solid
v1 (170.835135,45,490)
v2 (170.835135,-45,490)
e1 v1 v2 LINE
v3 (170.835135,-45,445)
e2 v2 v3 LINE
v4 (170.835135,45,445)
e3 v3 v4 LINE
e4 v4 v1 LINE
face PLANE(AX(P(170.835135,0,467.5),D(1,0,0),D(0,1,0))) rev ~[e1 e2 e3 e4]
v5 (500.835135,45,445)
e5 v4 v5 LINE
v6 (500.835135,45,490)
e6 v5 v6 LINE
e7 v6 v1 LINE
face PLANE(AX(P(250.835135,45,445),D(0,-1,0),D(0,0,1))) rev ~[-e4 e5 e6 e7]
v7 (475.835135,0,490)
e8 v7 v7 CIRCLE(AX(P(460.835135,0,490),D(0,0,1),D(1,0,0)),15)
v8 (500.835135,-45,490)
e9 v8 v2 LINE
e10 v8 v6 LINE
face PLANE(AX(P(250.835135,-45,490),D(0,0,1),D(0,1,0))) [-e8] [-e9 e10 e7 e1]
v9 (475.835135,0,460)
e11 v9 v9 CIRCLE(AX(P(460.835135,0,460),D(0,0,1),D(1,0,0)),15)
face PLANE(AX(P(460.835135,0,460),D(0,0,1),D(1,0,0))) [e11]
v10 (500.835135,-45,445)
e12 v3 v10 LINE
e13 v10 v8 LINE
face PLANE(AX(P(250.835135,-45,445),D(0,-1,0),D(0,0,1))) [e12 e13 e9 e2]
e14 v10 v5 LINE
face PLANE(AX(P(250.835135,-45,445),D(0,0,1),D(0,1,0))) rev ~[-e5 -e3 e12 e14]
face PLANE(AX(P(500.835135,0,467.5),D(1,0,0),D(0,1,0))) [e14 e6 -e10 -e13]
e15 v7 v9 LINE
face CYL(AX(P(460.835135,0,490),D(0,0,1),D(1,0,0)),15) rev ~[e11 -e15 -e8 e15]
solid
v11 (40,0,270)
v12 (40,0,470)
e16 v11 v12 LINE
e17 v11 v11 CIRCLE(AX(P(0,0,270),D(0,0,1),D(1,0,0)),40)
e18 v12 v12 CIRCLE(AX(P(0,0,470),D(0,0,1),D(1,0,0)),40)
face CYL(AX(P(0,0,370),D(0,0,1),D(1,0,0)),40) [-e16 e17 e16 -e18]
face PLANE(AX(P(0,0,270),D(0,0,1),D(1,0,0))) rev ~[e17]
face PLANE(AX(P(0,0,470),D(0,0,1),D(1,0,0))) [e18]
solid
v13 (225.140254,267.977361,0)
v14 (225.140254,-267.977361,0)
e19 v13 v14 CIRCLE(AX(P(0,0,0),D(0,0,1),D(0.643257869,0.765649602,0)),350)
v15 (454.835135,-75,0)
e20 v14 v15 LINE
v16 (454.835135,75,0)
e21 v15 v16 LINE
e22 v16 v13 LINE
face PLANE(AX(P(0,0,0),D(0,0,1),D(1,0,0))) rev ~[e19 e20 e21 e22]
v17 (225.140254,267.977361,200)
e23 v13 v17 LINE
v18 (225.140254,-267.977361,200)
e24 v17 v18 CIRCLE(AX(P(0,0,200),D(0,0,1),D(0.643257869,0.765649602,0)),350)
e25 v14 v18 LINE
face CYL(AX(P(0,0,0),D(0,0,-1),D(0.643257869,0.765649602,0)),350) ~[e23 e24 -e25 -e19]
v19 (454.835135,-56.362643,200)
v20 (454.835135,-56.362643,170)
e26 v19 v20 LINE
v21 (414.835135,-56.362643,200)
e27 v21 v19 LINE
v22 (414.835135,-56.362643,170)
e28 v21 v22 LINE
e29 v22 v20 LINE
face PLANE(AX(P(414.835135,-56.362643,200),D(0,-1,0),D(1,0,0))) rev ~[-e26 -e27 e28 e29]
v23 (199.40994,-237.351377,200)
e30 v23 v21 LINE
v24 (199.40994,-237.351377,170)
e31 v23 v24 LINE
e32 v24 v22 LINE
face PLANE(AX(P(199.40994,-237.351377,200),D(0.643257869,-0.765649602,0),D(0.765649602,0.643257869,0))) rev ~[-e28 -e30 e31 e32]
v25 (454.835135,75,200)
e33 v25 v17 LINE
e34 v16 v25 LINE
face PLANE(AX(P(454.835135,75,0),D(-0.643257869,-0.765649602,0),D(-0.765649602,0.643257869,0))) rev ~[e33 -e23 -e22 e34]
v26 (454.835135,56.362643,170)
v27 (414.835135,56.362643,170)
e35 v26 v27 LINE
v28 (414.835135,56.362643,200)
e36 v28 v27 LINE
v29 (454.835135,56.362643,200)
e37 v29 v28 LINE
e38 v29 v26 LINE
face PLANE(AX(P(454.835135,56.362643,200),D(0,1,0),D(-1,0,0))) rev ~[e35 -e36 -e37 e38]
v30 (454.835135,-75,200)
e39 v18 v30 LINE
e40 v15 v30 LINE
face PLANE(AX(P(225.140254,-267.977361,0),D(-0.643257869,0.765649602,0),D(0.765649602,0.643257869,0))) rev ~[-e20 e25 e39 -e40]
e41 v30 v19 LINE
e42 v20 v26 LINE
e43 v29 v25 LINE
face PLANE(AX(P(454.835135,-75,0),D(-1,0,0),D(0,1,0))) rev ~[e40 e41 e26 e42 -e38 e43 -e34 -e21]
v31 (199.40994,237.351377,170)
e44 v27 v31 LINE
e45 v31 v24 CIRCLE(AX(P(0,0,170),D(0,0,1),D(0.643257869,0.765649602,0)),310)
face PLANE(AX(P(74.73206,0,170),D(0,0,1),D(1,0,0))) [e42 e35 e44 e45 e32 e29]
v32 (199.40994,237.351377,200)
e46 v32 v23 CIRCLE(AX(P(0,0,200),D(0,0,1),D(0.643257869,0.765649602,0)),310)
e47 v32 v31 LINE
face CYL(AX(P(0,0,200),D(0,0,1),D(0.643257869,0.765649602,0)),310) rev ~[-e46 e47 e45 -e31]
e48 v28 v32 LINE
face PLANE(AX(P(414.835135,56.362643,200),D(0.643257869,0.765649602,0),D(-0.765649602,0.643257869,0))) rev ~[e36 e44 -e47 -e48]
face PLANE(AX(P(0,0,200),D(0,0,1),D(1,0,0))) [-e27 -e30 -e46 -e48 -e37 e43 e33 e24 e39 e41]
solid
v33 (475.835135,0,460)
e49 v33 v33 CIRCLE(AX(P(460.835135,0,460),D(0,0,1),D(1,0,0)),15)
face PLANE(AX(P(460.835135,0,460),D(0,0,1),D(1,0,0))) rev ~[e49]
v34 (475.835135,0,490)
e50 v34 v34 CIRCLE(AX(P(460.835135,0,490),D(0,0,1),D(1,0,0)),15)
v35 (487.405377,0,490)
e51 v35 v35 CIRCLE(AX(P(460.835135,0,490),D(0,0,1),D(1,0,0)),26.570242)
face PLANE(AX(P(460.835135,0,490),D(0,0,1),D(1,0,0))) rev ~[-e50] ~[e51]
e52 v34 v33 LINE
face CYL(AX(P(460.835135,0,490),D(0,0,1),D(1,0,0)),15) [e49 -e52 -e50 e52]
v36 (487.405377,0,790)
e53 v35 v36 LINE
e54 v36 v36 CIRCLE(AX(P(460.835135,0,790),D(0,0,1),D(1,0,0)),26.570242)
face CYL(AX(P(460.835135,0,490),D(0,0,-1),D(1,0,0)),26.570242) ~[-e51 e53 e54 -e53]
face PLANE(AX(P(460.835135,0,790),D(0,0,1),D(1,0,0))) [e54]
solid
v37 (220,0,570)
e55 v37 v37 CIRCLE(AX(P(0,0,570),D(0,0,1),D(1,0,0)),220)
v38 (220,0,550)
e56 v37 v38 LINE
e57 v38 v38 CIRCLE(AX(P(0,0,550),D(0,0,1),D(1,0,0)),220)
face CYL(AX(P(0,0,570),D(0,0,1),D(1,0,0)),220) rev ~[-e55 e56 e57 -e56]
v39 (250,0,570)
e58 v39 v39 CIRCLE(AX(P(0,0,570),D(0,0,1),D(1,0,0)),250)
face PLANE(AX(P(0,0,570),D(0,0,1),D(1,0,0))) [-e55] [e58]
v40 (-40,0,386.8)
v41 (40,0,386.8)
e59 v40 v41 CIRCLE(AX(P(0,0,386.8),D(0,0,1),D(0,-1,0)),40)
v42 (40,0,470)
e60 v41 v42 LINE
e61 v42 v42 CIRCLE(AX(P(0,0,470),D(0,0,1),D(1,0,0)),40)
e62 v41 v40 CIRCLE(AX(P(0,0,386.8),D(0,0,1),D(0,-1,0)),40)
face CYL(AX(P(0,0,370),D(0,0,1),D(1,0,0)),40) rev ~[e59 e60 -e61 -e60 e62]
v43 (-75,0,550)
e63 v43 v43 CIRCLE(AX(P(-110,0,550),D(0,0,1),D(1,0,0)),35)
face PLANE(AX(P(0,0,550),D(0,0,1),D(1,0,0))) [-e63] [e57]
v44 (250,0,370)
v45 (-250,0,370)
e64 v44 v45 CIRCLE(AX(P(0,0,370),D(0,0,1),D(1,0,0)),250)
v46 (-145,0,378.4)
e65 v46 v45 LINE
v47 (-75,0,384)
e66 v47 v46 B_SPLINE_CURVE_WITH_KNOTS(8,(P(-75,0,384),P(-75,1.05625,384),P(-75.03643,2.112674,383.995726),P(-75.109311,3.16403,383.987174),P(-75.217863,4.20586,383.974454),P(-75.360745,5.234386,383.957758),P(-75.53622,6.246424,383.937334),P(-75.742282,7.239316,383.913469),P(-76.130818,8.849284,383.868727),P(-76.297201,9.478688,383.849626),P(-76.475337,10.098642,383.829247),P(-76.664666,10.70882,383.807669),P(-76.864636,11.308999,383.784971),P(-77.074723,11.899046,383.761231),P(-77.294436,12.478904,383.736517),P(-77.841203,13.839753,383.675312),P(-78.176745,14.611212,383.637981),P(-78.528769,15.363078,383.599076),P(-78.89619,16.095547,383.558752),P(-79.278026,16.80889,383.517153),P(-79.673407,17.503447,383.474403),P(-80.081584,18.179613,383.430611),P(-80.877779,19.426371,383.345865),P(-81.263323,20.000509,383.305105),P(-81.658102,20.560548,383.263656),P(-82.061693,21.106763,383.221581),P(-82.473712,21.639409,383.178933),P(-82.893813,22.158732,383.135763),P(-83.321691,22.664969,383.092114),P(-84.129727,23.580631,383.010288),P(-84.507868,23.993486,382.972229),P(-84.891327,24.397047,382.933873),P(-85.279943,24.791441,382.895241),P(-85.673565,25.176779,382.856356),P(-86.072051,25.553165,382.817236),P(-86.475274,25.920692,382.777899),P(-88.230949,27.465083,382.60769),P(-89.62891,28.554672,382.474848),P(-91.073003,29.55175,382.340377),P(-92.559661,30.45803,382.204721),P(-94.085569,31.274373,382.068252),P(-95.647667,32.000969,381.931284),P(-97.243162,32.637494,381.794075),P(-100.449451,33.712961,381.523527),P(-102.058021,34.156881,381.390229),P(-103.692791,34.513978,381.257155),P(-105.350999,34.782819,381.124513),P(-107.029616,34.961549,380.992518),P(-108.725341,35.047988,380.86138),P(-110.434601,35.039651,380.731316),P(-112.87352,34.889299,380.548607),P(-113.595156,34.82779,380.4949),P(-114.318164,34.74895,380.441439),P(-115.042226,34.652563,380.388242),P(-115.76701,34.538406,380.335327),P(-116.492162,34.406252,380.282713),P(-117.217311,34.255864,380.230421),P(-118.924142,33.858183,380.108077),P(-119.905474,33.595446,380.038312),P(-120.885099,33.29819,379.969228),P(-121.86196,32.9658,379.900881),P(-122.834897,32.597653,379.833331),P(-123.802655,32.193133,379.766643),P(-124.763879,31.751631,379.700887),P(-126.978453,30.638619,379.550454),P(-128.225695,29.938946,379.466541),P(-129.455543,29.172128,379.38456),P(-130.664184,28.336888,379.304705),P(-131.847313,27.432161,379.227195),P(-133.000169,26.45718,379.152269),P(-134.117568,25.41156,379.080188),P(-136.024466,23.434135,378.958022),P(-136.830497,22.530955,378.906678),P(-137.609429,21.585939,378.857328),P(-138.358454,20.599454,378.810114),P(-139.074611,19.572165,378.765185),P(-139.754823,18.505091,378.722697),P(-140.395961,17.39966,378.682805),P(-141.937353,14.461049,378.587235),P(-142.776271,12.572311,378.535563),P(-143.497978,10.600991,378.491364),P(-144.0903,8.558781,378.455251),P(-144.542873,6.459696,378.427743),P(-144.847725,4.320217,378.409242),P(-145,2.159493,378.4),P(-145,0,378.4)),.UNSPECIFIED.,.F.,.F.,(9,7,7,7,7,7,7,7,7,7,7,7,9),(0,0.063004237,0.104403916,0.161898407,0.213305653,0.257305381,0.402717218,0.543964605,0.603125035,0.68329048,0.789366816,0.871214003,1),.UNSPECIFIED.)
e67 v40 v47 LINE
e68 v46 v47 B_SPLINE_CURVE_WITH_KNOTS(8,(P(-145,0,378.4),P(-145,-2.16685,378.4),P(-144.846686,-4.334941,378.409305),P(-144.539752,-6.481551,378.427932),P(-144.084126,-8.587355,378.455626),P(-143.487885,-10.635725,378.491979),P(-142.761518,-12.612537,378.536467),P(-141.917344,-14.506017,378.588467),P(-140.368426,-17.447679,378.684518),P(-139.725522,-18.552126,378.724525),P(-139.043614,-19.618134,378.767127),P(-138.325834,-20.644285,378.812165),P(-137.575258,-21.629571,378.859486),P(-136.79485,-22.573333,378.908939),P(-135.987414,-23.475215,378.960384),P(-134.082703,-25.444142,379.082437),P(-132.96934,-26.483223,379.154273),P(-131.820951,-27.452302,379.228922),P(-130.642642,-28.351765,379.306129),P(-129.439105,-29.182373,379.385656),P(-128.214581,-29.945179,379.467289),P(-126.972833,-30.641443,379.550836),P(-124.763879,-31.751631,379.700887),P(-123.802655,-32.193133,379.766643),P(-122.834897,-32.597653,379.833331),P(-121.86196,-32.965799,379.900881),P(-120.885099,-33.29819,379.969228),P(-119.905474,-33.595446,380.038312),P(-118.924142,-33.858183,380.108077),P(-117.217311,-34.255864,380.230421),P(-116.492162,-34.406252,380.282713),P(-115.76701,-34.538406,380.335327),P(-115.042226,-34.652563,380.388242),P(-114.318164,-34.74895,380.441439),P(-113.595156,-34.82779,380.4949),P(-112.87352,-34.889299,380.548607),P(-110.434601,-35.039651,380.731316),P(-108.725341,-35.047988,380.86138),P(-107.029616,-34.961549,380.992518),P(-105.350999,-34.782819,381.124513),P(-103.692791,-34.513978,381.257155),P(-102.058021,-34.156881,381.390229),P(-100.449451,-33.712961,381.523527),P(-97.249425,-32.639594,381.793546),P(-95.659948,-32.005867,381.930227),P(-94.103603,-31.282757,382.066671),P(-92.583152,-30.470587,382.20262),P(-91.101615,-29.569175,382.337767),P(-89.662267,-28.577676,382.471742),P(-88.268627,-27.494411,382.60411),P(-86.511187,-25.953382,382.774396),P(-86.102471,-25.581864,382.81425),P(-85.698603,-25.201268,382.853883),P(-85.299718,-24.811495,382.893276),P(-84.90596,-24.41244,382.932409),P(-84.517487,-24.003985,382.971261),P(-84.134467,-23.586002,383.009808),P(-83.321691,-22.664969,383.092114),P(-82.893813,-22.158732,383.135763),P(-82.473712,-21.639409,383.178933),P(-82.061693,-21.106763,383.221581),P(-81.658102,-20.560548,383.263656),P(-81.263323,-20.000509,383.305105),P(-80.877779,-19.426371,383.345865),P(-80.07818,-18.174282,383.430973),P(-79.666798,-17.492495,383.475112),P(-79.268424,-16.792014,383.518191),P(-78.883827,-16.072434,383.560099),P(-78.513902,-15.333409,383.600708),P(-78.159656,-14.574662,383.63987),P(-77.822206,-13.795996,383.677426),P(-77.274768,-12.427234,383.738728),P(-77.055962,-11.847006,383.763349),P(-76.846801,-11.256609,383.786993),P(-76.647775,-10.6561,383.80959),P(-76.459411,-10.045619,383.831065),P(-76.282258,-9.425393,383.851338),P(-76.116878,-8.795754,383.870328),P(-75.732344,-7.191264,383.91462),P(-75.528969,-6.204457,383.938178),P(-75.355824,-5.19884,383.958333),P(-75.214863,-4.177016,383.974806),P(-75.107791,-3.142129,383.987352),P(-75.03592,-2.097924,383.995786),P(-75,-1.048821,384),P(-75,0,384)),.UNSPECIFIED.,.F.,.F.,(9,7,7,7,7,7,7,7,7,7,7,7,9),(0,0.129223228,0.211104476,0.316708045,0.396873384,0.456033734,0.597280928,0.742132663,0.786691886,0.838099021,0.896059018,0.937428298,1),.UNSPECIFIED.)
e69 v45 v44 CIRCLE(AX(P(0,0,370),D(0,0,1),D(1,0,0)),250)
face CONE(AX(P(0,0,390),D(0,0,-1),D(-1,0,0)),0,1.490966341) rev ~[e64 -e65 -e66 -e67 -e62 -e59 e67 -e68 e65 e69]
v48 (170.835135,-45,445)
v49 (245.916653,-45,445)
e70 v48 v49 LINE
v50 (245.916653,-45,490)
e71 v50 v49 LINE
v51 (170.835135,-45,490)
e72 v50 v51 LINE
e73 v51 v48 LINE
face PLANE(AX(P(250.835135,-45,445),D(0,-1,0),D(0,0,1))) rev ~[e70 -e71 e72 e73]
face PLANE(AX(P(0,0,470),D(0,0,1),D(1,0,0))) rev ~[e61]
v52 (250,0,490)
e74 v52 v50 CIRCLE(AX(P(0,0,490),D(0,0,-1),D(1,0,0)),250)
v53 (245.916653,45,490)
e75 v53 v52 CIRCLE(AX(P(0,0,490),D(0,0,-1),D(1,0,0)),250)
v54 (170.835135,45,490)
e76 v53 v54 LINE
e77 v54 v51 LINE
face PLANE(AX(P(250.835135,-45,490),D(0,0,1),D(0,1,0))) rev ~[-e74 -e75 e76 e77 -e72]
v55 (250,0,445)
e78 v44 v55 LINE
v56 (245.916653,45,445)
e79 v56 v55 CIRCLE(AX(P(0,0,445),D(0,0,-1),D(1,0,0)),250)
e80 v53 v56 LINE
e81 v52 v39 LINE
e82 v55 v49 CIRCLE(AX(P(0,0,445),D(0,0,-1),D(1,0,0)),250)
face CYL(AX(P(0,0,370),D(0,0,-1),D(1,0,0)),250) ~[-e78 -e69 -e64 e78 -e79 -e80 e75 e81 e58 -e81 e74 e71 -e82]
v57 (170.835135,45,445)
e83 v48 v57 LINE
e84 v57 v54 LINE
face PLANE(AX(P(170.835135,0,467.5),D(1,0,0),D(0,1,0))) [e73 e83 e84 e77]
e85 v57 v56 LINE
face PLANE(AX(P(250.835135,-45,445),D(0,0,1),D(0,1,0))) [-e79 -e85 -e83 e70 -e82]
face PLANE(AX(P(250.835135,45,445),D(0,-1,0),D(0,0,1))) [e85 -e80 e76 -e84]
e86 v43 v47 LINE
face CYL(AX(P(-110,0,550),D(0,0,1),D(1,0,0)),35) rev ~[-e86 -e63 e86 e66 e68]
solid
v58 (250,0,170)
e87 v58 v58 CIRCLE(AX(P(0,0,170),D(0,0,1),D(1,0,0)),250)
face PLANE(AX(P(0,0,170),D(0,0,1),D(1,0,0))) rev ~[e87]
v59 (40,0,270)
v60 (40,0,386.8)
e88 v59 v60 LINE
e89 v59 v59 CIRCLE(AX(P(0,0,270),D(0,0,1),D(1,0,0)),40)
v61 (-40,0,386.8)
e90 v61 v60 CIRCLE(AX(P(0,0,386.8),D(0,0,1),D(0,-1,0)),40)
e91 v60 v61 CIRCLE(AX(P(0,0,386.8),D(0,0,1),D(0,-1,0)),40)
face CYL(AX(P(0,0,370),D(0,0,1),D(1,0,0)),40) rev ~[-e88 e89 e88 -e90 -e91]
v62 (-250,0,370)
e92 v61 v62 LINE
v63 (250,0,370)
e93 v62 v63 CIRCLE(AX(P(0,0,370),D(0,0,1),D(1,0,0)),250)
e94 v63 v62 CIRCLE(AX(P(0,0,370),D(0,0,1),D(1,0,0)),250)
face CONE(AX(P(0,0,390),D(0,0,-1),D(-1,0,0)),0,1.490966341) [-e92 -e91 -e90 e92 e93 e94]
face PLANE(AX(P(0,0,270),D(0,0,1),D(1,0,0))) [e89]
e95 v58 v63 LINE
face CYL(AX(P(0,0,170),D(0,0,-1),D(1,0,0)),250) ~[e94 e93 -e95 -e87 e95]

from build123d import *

# Parameters (mm, degrees)
F1_DEPTH  = 200
F3_DEPTH  = 30
F4_R      = 250
F5_DEPTH  = 200
F9_R      = 40
F10_DEPTH = 100
F11_R     = 250
F13_DEPTH = 200
F15_R     = 220
F16_DEPTH = 20
F17_R     = 35
F18_REACH = 648.9959493661
F21_DEPTH = 80
F22_W     = 90
F22_H     = 45
F23_DEPTH = 250
F24_R     = 15
F25_DEPTH = 30
F27_R     = 26.5702417315
F28_DEPTH = 300


with BuildPart() as f1:
    # F0 (on Top) → F1 (new body)
    with BuildSketch(Plane.XY):
        with BuildLine():
            ThreePointArc((225.1402542748, -267.977360807), (317.2531237011, -147.8189957411), (350, 0))
            ThreePointArc((350, 0), (317.2531237011, 147.8189957411), (225.1402542748, 267.977360807))
            ThreePointArc((225.1402542748, 267.977360807), (-350, 0), (225.1402542748, -267.977360807))
        make_face()
        with BuildLine():
            ThreePointArc((225.1402542748, 267.977360807), (317.2531237011, 147.8189957411), (350, 0))
            ThreePointArc((350, 0), (317.2531237011, -147.8189957411), (225.1402542748, -267.977360807))
            Line((225.1402542748, -267.977360807), (454.8351349665, -75))
            Line((454.8351349665, -75), (454.8351349665, 0))
            Line((454.8351349665, 0), (454.8351349665, 75))
            Line((454.8351349665, 75), (225.1402542748, 267.977360807))
        make_face()
    extrude(amount=F1_DEPTH)

    # F2 (on face) → F3 (cut)
    with BuildSketch(Plane.XY.offset(200)):
        with BuildLine():
            Line((414.8351349665, 56.3626426726), (199.4099395005, 237.3513767148))
            ThreePointArc((199.4099395005, 237.3513767148), (-310, 0), (199.4099395005, -237.3513767148))
            Line((199.4099395005, -237.3513767148), (414.8351349665, -56.3626426726))
            Line((414.8351349665, -56.3626426726), (454.8351349665, -56.3626426726))
            Line((454.8351349665, -56.3626426726), (454.8351349665, 56.3626426726))
            Line((454.8351349665, 56.3626426726), (414.8351349665, 56.3626426726))
        make_face()
    extrude(amount=-F3_DEPTH, mode=Mode.SUBTRACT)


with BuildPart() as f5:
    # F4 (on face) → F5 (new body)
    with BuildSketch(Plane.XY.offset(170)):
        Circle(F4_R)
    extrude(amount=F5_DEPTH)

    # F6 (on Front) → F7 (revolve)
    with BuildSketch(Plane.XZ):
        Polygon((0, 370), (0, 390), (-250, 370), align=None)
    revolve(axis=Axis((0, 0, 380), (0, 0, -1)))


with BuildPart() as f10:
    # F9 (on offset) → F10 (new body, symmetric)
    with BuildSketch(Plane.XY.offset(370)):
        Circle(F9_R)
    extrude(amount=F10_DEPTH, both=True)


with BuildPart() as f5_1:
    add(f5.part)

    # F12: cut F10
    add(f10.part, mode=Mode.SUBTRACT)


with BuildPart() as f13:
    # F11 (on offset) → F13 (new body)
    with BuildSketch(Plane.XY.offset(370)):
        Circle(F11_R)
    extrude(amount=F13_DEPTH)

    # F14: cut F10, F5
    add(f10.part, mode=Mode.SUBTRACT)
    add(f5_1.part, mode=Mode.SUBTRACT)

    # F15 (on face) → F16 (cut)
    with BuildSketch(Plane.XY.offset(570)):
        Circle(F15_R)
    extrude(amount=-F16_DEPTH, mode=Mode.SUBTRACT)

    f18_end = f5_1.part.faces().sort_by_distance((145, 0, 378.4))[0]
    # F17 (on face) → F18 (cut, up to a face of F5 that its end follows)
    with BuildSketch(Plane.XY.offset(550)):
        with Locations((-110, 0)):
            Circle(F17_R)
    f18_long = extrude(amount=-F18_REACH, mode=Mode.PRIVATE)
    add(split(f18_long, bisect_by=f18_end, keep=Keep.TOP, mode=Mode.PRIVATE), mode=Mode.SUBTRACT)


with BuildPart() as f21:
    # F20 (on offset) → F21 (new body)
    with BuildSketch(Plane.YZ.offset(250.8351349665)):
        Polygon((0, 490), (-45, 490), (-45, 445), (0, 445), (45, 445), (45, 490), align=None)
    extrude(amount=-F21_DEPTH)

    # F22 (on face) → F23 (join)
    with BuildSketch(Plane.YZ.offset(250.8351349665)):
        with Locations((0, 467.5)):
            Rectangle(F22_W, F22_H)
    extrude(amount=F23_DEPTH)


with BuildPart() as f25:
    # F24 (on face) → F25 (new body)
    with BuildSketch(Plane.XY.offset(490)):
        with Locations((460.8351349665, 0)):
            Circle(F24_R)
    extrude(amount=-F25_DEPTH)


with BuildPart() as f21_1:
    add(f21.part)

    # F26: cut F25
    add(f25.part, mode=Mode.SUBTRACT)


with BuildPart() as f25_1:
    add(f25.part)

    # F27 (on face) → F28 (join)
    with BuildSketch(Plane.XY.offset(490)):
        with Locations((460.8351349665, 0)):
            Circle(F27_R)
    extrude(amount=F28_DEPTH)


with BuildPart() as f13_1:
    add(f13.part)

    # F29: cut F21
    add(f21_1.part, mode=Mode.SUBTRACT)


solid = Compound([f1.part, f10.part, f5_1.part, f21_1.part, f25_1.part, f13_1.part])
